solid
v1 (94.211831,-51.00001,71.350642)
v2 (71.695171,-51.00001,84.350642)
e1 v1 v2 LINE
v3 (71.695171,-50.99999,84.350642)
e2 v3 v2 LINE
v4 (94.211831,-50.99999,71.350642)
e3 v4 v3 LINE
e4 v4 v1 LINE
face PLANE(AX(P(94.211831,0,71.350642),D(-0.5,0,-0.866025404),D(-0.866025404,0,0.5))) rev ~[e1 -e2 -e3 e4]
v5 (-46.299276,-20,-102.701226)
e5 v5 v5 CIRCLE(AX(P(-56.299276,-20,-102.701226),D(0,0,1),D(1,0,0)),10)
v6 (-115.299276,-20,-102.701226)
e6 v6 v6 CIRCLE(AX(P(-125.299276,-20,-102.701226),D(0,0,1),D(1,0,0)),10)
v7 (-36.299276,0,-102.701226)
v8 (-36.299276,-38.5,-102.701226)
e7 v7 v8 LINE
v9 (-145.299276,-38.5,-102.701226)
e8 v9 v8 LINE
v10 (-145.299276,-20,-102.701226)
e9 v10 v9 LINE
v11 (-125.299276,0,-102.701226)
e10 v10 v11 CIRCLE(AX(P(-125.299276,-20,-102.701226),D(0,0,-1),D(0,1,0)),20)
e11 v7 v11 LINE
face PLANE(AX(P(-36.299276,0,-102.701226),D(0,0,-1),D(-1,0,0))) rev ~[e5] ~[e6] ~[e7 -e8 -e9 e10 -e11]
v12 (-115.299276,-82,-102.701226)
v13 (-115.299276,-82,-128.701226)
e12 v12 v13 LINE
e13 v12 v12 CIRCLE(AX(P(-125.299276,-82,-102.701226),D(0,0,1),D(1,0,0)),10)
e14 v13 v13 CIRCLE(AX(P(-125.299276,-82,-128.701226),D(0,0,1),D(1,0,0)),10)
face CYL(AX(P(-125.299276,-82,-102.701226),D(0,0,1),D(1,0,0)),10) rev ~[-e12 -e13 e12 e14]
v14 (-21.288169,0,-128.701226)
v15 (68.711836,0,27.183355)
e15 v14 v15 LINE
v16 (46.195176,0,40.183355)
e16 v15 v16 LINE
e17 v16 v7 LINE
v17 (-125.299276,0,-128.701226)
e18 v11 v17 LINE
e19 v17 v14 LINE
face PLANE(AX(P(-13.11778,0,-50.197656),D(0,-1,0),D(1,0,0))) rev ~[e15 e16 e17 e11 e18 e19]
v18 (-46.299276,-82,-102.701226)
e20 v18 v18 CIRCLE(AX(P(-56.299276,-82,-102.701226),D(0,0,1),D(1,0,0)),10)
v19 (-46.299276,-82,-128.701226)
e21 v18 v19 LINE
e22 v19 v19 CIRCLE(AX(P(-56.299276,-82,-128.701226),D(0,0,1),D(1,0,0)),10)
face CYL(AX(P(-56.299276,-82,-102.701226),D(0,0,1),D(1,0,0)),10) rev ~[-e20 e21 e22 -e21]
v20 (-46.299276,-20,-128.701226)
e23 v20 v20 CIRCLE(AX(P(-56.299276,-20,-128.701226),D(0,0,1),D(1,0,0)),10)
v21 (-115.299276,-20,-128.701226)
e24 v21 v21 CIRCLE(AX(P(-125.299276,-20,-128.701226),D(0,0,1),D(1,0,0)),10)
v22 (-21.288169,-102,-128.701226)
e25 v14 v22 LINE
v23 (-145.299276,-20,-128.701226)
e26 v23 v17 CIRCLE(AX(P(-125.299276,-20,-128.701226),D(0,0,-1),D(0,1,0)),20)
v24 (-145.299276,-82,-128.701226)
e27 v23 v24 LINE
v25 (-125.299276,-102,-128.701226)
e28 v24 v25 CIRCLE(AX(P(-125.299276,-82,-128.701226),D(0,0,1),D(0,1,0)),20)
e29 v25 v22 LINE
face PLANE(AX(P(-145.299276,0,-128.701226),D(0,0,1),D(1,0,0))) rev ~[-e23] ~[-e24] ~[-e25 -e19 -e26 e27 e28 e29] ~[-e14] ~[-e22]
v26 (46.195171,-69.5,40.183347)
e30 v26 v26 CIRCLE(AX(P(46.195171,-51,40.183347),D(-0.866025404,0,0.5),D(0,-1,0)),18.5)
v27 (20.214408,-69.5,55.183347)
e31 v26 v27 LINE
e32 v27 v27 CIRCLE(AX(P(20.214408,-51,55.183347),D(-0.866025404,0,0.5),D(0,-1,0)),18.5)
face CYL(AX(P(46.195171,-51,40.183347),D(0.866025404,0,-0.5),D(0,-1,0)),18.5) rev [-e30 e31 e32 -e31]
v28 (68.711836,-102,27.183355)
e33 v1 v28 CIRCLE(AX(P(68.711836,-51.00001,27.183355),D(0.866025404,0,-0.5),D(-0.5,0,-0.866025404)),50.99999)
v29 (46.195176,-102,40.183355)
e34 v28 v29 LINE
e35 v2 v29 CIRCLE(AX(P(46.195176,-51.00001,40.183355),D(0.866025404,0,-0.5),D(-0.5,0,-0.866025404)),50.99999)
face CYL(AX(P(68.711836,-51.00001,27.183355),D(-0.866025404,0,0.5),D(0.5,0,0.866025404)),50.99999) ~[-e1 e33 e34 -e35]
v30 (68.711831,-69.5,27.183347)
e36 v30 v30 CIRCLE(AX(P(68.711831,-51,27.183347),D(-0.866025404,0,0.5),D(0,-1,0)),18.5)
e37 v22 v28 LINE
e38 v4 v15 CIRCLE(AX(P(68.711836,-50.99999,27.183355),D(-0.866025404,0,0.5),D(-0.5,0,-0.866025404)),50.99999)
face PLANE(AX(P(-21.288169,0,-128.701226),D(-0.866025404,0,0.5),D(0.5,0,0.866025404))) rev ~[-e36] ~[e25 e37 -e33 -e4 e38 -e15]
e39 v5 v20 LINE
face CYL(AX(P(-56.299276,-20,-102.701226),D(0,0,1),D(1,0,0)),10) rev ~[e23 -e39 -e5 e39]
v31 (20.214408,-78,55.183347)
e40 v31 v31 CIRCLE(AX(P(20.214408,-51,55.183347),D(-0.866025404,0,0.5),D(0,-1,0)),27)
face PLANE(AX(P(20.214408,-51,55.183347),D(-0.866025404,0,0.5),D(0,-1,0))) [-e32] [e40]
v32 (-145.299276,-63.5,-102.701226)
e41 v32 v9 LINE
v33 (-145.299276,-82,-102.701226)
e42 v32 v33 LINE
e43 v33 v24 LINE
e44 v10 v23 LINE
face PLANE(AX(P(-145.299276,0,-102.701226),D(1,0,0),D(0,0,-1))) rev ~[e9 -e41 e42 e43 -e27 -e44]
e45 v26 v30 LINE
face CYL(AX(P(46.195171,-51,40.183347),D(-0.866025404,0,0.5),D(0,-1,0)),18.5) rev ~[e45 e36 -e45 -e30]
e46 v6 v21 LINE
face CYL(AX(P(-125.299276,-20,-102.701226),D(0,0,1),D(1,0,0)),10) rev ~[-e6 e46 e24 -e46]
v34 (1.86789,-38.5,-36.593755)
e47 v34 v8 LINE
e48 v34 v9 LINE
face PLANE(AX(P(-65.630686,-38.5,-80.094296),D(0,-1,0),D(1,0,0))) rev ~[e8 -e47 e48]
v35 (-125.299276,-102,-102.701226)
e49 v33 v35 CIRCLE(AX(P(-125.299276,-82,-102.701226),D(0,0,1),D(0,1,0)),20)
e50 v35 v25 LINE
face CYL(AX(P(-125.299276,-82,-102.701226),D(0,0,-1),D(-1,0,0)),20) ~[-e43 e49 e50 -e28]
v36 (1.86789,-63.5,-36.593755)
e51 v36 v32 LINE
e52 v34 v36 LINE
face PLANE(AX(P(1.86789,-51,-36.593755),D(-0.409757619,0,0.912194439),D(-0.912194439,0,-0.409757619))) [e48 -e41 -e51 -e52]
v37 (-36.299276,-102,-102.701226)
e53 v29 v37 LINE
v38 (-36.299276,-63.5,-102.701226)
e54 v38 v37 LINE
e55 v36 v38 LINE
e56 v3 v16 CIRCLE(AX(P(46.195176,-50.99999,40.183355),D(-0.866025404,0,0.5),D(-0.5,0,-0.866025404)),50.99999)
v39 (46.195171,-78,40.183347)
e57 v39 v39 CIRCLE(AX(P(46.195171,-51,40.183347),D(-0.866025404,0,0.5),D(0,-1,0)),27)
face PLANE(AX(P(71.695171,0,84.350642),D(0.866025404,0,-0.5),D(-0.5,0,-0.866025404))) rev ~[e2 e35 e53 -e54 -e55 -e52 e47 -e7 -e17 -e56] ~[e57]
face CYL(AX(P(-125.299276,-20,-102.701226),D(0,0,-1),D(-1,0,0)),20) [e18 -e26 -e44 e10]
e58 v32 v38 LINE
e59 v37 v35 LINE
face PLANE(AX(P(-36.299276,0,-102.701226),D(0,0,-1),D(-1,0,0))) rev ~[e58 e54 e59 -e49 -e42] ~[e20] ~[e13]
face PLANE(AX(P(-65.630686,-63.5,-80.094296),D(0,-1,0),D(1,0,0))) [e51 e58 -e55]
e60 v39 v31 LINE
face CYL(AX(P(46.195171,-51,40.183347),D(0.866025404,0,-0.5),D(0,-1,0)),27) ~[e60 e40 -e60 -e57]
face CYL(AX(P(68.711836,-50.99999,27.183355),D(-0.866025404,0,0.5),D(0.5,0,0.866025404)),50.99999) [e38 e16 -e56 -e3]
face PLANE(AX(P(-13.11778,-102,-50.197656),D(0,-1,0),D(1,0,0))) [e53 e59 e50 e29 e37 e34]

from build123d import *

# Parameters (mm, degrees)
F1_DEPTH  = 102
F2_R      = 50.99999
F3_R      = 27
F3_R_2    = 18.5
F4_DEPTH  = 30
F5_R      = 18.5
F6_DEPTH  = 30
F7_R      = 10
F8_DEPTH  = 30
F11_DEPTH = 12.5
F12_R     = 20


# Not quite as in the source:
# - a fillet or chamfer is up to 0.001 mm smaller than in the source, because OpenCascade refuses the exact size


with BuildPart() as f1:
    # F0 (on Front) → F1 (new body)
    with BuildSketch(Plane.XZ):
        Polygon((-36.2992759747, -102.7012261555), (-145.2992759747, -102.7012261555), (-145.2992759747, -128.7012261555), (-21.2881689757, -128.7012261555), (94.2118310243, 71.3506421187), (71.6951705259, 84.3506421187), align=None)
    extrude(amount=F1_DEPTH)

    # F2 (radius 51 in the source; OpenCascade refuses exactly that, so slightly less here)
    f2_edges = [f1.edges().sort_by_distance(p)[0] for p in [
        (82.953501, 0, 77.850642),
        (82.953501, -102, 77.850642),
    ]]
    fillet(f2_edges, radius=F2_R)

    # F3 (on face) → F4 (join)
    with BuildSketch(Plane(origin=(17.2464784442, 0, -9.9572589724), x_dir=(0, -1, 0), z_dir=(-0.8660254038, 0, 0.5))):
        with Locations((51, 57.8973841632)):
            Circle(F3_R)
        with Locations((51, 57.8973841632)):
            Circle(F3_R_2, mode=Mode.SUBTRACT)
    extrude(amount=F4_DEPTH)

    # F5 (on face) → F6 (cut)
    with BuildSketch(Plane(origin=(17.2464784442, 0, -9.9572589724), x_dir=(0, -1, 0), z_dir=(-0.8660254038, 0, 0.5))):
        with Locations((51, 57.8973841632)):
            Circle(F5_R)
    extrude(amount=-F6_DEPTH, mode=Mode.SUBTRACT)

    # F7 (on face) → F8 (cut)
    with BuildSketch(Plane.XY.offset(-102.7012261555)):
        with Locations((-125.2992759747, -20)):
            Circle(F7_R)
        with Locations((-125.2992759747, -82)):
            Circle(F7_R)
        with Locations((-56.2992759747, -20)):
            Circle(F7_R)
        with Locations((-56.2992759747, -82)):
            Circle(F7_R)
    extrude(amount=-F8_DEPTH, mode=Mode.SUBTRACT)

    # F10 (on offset) → F11 (join, symmetric)
    with BuildSketch(Plane.XZ.offset(51)):
        Polygon((-35.6261391794, -102.7012261555), (1.8678903299, -36.5937549351), (-145.2992759747, -102.7012261555), align=None)
    extrude(amount=F11_DEPTH, both=True)

    # F12
    f12_edges = [f1.edges().sort_by_distance(p)[0] for p in [
        (-145.299276, 0, -115.701226),
        (-145.299276, -102, -115.701226),
    ]]
    fillet(f12_edges, radius=F12_R)


solid = f1.part
